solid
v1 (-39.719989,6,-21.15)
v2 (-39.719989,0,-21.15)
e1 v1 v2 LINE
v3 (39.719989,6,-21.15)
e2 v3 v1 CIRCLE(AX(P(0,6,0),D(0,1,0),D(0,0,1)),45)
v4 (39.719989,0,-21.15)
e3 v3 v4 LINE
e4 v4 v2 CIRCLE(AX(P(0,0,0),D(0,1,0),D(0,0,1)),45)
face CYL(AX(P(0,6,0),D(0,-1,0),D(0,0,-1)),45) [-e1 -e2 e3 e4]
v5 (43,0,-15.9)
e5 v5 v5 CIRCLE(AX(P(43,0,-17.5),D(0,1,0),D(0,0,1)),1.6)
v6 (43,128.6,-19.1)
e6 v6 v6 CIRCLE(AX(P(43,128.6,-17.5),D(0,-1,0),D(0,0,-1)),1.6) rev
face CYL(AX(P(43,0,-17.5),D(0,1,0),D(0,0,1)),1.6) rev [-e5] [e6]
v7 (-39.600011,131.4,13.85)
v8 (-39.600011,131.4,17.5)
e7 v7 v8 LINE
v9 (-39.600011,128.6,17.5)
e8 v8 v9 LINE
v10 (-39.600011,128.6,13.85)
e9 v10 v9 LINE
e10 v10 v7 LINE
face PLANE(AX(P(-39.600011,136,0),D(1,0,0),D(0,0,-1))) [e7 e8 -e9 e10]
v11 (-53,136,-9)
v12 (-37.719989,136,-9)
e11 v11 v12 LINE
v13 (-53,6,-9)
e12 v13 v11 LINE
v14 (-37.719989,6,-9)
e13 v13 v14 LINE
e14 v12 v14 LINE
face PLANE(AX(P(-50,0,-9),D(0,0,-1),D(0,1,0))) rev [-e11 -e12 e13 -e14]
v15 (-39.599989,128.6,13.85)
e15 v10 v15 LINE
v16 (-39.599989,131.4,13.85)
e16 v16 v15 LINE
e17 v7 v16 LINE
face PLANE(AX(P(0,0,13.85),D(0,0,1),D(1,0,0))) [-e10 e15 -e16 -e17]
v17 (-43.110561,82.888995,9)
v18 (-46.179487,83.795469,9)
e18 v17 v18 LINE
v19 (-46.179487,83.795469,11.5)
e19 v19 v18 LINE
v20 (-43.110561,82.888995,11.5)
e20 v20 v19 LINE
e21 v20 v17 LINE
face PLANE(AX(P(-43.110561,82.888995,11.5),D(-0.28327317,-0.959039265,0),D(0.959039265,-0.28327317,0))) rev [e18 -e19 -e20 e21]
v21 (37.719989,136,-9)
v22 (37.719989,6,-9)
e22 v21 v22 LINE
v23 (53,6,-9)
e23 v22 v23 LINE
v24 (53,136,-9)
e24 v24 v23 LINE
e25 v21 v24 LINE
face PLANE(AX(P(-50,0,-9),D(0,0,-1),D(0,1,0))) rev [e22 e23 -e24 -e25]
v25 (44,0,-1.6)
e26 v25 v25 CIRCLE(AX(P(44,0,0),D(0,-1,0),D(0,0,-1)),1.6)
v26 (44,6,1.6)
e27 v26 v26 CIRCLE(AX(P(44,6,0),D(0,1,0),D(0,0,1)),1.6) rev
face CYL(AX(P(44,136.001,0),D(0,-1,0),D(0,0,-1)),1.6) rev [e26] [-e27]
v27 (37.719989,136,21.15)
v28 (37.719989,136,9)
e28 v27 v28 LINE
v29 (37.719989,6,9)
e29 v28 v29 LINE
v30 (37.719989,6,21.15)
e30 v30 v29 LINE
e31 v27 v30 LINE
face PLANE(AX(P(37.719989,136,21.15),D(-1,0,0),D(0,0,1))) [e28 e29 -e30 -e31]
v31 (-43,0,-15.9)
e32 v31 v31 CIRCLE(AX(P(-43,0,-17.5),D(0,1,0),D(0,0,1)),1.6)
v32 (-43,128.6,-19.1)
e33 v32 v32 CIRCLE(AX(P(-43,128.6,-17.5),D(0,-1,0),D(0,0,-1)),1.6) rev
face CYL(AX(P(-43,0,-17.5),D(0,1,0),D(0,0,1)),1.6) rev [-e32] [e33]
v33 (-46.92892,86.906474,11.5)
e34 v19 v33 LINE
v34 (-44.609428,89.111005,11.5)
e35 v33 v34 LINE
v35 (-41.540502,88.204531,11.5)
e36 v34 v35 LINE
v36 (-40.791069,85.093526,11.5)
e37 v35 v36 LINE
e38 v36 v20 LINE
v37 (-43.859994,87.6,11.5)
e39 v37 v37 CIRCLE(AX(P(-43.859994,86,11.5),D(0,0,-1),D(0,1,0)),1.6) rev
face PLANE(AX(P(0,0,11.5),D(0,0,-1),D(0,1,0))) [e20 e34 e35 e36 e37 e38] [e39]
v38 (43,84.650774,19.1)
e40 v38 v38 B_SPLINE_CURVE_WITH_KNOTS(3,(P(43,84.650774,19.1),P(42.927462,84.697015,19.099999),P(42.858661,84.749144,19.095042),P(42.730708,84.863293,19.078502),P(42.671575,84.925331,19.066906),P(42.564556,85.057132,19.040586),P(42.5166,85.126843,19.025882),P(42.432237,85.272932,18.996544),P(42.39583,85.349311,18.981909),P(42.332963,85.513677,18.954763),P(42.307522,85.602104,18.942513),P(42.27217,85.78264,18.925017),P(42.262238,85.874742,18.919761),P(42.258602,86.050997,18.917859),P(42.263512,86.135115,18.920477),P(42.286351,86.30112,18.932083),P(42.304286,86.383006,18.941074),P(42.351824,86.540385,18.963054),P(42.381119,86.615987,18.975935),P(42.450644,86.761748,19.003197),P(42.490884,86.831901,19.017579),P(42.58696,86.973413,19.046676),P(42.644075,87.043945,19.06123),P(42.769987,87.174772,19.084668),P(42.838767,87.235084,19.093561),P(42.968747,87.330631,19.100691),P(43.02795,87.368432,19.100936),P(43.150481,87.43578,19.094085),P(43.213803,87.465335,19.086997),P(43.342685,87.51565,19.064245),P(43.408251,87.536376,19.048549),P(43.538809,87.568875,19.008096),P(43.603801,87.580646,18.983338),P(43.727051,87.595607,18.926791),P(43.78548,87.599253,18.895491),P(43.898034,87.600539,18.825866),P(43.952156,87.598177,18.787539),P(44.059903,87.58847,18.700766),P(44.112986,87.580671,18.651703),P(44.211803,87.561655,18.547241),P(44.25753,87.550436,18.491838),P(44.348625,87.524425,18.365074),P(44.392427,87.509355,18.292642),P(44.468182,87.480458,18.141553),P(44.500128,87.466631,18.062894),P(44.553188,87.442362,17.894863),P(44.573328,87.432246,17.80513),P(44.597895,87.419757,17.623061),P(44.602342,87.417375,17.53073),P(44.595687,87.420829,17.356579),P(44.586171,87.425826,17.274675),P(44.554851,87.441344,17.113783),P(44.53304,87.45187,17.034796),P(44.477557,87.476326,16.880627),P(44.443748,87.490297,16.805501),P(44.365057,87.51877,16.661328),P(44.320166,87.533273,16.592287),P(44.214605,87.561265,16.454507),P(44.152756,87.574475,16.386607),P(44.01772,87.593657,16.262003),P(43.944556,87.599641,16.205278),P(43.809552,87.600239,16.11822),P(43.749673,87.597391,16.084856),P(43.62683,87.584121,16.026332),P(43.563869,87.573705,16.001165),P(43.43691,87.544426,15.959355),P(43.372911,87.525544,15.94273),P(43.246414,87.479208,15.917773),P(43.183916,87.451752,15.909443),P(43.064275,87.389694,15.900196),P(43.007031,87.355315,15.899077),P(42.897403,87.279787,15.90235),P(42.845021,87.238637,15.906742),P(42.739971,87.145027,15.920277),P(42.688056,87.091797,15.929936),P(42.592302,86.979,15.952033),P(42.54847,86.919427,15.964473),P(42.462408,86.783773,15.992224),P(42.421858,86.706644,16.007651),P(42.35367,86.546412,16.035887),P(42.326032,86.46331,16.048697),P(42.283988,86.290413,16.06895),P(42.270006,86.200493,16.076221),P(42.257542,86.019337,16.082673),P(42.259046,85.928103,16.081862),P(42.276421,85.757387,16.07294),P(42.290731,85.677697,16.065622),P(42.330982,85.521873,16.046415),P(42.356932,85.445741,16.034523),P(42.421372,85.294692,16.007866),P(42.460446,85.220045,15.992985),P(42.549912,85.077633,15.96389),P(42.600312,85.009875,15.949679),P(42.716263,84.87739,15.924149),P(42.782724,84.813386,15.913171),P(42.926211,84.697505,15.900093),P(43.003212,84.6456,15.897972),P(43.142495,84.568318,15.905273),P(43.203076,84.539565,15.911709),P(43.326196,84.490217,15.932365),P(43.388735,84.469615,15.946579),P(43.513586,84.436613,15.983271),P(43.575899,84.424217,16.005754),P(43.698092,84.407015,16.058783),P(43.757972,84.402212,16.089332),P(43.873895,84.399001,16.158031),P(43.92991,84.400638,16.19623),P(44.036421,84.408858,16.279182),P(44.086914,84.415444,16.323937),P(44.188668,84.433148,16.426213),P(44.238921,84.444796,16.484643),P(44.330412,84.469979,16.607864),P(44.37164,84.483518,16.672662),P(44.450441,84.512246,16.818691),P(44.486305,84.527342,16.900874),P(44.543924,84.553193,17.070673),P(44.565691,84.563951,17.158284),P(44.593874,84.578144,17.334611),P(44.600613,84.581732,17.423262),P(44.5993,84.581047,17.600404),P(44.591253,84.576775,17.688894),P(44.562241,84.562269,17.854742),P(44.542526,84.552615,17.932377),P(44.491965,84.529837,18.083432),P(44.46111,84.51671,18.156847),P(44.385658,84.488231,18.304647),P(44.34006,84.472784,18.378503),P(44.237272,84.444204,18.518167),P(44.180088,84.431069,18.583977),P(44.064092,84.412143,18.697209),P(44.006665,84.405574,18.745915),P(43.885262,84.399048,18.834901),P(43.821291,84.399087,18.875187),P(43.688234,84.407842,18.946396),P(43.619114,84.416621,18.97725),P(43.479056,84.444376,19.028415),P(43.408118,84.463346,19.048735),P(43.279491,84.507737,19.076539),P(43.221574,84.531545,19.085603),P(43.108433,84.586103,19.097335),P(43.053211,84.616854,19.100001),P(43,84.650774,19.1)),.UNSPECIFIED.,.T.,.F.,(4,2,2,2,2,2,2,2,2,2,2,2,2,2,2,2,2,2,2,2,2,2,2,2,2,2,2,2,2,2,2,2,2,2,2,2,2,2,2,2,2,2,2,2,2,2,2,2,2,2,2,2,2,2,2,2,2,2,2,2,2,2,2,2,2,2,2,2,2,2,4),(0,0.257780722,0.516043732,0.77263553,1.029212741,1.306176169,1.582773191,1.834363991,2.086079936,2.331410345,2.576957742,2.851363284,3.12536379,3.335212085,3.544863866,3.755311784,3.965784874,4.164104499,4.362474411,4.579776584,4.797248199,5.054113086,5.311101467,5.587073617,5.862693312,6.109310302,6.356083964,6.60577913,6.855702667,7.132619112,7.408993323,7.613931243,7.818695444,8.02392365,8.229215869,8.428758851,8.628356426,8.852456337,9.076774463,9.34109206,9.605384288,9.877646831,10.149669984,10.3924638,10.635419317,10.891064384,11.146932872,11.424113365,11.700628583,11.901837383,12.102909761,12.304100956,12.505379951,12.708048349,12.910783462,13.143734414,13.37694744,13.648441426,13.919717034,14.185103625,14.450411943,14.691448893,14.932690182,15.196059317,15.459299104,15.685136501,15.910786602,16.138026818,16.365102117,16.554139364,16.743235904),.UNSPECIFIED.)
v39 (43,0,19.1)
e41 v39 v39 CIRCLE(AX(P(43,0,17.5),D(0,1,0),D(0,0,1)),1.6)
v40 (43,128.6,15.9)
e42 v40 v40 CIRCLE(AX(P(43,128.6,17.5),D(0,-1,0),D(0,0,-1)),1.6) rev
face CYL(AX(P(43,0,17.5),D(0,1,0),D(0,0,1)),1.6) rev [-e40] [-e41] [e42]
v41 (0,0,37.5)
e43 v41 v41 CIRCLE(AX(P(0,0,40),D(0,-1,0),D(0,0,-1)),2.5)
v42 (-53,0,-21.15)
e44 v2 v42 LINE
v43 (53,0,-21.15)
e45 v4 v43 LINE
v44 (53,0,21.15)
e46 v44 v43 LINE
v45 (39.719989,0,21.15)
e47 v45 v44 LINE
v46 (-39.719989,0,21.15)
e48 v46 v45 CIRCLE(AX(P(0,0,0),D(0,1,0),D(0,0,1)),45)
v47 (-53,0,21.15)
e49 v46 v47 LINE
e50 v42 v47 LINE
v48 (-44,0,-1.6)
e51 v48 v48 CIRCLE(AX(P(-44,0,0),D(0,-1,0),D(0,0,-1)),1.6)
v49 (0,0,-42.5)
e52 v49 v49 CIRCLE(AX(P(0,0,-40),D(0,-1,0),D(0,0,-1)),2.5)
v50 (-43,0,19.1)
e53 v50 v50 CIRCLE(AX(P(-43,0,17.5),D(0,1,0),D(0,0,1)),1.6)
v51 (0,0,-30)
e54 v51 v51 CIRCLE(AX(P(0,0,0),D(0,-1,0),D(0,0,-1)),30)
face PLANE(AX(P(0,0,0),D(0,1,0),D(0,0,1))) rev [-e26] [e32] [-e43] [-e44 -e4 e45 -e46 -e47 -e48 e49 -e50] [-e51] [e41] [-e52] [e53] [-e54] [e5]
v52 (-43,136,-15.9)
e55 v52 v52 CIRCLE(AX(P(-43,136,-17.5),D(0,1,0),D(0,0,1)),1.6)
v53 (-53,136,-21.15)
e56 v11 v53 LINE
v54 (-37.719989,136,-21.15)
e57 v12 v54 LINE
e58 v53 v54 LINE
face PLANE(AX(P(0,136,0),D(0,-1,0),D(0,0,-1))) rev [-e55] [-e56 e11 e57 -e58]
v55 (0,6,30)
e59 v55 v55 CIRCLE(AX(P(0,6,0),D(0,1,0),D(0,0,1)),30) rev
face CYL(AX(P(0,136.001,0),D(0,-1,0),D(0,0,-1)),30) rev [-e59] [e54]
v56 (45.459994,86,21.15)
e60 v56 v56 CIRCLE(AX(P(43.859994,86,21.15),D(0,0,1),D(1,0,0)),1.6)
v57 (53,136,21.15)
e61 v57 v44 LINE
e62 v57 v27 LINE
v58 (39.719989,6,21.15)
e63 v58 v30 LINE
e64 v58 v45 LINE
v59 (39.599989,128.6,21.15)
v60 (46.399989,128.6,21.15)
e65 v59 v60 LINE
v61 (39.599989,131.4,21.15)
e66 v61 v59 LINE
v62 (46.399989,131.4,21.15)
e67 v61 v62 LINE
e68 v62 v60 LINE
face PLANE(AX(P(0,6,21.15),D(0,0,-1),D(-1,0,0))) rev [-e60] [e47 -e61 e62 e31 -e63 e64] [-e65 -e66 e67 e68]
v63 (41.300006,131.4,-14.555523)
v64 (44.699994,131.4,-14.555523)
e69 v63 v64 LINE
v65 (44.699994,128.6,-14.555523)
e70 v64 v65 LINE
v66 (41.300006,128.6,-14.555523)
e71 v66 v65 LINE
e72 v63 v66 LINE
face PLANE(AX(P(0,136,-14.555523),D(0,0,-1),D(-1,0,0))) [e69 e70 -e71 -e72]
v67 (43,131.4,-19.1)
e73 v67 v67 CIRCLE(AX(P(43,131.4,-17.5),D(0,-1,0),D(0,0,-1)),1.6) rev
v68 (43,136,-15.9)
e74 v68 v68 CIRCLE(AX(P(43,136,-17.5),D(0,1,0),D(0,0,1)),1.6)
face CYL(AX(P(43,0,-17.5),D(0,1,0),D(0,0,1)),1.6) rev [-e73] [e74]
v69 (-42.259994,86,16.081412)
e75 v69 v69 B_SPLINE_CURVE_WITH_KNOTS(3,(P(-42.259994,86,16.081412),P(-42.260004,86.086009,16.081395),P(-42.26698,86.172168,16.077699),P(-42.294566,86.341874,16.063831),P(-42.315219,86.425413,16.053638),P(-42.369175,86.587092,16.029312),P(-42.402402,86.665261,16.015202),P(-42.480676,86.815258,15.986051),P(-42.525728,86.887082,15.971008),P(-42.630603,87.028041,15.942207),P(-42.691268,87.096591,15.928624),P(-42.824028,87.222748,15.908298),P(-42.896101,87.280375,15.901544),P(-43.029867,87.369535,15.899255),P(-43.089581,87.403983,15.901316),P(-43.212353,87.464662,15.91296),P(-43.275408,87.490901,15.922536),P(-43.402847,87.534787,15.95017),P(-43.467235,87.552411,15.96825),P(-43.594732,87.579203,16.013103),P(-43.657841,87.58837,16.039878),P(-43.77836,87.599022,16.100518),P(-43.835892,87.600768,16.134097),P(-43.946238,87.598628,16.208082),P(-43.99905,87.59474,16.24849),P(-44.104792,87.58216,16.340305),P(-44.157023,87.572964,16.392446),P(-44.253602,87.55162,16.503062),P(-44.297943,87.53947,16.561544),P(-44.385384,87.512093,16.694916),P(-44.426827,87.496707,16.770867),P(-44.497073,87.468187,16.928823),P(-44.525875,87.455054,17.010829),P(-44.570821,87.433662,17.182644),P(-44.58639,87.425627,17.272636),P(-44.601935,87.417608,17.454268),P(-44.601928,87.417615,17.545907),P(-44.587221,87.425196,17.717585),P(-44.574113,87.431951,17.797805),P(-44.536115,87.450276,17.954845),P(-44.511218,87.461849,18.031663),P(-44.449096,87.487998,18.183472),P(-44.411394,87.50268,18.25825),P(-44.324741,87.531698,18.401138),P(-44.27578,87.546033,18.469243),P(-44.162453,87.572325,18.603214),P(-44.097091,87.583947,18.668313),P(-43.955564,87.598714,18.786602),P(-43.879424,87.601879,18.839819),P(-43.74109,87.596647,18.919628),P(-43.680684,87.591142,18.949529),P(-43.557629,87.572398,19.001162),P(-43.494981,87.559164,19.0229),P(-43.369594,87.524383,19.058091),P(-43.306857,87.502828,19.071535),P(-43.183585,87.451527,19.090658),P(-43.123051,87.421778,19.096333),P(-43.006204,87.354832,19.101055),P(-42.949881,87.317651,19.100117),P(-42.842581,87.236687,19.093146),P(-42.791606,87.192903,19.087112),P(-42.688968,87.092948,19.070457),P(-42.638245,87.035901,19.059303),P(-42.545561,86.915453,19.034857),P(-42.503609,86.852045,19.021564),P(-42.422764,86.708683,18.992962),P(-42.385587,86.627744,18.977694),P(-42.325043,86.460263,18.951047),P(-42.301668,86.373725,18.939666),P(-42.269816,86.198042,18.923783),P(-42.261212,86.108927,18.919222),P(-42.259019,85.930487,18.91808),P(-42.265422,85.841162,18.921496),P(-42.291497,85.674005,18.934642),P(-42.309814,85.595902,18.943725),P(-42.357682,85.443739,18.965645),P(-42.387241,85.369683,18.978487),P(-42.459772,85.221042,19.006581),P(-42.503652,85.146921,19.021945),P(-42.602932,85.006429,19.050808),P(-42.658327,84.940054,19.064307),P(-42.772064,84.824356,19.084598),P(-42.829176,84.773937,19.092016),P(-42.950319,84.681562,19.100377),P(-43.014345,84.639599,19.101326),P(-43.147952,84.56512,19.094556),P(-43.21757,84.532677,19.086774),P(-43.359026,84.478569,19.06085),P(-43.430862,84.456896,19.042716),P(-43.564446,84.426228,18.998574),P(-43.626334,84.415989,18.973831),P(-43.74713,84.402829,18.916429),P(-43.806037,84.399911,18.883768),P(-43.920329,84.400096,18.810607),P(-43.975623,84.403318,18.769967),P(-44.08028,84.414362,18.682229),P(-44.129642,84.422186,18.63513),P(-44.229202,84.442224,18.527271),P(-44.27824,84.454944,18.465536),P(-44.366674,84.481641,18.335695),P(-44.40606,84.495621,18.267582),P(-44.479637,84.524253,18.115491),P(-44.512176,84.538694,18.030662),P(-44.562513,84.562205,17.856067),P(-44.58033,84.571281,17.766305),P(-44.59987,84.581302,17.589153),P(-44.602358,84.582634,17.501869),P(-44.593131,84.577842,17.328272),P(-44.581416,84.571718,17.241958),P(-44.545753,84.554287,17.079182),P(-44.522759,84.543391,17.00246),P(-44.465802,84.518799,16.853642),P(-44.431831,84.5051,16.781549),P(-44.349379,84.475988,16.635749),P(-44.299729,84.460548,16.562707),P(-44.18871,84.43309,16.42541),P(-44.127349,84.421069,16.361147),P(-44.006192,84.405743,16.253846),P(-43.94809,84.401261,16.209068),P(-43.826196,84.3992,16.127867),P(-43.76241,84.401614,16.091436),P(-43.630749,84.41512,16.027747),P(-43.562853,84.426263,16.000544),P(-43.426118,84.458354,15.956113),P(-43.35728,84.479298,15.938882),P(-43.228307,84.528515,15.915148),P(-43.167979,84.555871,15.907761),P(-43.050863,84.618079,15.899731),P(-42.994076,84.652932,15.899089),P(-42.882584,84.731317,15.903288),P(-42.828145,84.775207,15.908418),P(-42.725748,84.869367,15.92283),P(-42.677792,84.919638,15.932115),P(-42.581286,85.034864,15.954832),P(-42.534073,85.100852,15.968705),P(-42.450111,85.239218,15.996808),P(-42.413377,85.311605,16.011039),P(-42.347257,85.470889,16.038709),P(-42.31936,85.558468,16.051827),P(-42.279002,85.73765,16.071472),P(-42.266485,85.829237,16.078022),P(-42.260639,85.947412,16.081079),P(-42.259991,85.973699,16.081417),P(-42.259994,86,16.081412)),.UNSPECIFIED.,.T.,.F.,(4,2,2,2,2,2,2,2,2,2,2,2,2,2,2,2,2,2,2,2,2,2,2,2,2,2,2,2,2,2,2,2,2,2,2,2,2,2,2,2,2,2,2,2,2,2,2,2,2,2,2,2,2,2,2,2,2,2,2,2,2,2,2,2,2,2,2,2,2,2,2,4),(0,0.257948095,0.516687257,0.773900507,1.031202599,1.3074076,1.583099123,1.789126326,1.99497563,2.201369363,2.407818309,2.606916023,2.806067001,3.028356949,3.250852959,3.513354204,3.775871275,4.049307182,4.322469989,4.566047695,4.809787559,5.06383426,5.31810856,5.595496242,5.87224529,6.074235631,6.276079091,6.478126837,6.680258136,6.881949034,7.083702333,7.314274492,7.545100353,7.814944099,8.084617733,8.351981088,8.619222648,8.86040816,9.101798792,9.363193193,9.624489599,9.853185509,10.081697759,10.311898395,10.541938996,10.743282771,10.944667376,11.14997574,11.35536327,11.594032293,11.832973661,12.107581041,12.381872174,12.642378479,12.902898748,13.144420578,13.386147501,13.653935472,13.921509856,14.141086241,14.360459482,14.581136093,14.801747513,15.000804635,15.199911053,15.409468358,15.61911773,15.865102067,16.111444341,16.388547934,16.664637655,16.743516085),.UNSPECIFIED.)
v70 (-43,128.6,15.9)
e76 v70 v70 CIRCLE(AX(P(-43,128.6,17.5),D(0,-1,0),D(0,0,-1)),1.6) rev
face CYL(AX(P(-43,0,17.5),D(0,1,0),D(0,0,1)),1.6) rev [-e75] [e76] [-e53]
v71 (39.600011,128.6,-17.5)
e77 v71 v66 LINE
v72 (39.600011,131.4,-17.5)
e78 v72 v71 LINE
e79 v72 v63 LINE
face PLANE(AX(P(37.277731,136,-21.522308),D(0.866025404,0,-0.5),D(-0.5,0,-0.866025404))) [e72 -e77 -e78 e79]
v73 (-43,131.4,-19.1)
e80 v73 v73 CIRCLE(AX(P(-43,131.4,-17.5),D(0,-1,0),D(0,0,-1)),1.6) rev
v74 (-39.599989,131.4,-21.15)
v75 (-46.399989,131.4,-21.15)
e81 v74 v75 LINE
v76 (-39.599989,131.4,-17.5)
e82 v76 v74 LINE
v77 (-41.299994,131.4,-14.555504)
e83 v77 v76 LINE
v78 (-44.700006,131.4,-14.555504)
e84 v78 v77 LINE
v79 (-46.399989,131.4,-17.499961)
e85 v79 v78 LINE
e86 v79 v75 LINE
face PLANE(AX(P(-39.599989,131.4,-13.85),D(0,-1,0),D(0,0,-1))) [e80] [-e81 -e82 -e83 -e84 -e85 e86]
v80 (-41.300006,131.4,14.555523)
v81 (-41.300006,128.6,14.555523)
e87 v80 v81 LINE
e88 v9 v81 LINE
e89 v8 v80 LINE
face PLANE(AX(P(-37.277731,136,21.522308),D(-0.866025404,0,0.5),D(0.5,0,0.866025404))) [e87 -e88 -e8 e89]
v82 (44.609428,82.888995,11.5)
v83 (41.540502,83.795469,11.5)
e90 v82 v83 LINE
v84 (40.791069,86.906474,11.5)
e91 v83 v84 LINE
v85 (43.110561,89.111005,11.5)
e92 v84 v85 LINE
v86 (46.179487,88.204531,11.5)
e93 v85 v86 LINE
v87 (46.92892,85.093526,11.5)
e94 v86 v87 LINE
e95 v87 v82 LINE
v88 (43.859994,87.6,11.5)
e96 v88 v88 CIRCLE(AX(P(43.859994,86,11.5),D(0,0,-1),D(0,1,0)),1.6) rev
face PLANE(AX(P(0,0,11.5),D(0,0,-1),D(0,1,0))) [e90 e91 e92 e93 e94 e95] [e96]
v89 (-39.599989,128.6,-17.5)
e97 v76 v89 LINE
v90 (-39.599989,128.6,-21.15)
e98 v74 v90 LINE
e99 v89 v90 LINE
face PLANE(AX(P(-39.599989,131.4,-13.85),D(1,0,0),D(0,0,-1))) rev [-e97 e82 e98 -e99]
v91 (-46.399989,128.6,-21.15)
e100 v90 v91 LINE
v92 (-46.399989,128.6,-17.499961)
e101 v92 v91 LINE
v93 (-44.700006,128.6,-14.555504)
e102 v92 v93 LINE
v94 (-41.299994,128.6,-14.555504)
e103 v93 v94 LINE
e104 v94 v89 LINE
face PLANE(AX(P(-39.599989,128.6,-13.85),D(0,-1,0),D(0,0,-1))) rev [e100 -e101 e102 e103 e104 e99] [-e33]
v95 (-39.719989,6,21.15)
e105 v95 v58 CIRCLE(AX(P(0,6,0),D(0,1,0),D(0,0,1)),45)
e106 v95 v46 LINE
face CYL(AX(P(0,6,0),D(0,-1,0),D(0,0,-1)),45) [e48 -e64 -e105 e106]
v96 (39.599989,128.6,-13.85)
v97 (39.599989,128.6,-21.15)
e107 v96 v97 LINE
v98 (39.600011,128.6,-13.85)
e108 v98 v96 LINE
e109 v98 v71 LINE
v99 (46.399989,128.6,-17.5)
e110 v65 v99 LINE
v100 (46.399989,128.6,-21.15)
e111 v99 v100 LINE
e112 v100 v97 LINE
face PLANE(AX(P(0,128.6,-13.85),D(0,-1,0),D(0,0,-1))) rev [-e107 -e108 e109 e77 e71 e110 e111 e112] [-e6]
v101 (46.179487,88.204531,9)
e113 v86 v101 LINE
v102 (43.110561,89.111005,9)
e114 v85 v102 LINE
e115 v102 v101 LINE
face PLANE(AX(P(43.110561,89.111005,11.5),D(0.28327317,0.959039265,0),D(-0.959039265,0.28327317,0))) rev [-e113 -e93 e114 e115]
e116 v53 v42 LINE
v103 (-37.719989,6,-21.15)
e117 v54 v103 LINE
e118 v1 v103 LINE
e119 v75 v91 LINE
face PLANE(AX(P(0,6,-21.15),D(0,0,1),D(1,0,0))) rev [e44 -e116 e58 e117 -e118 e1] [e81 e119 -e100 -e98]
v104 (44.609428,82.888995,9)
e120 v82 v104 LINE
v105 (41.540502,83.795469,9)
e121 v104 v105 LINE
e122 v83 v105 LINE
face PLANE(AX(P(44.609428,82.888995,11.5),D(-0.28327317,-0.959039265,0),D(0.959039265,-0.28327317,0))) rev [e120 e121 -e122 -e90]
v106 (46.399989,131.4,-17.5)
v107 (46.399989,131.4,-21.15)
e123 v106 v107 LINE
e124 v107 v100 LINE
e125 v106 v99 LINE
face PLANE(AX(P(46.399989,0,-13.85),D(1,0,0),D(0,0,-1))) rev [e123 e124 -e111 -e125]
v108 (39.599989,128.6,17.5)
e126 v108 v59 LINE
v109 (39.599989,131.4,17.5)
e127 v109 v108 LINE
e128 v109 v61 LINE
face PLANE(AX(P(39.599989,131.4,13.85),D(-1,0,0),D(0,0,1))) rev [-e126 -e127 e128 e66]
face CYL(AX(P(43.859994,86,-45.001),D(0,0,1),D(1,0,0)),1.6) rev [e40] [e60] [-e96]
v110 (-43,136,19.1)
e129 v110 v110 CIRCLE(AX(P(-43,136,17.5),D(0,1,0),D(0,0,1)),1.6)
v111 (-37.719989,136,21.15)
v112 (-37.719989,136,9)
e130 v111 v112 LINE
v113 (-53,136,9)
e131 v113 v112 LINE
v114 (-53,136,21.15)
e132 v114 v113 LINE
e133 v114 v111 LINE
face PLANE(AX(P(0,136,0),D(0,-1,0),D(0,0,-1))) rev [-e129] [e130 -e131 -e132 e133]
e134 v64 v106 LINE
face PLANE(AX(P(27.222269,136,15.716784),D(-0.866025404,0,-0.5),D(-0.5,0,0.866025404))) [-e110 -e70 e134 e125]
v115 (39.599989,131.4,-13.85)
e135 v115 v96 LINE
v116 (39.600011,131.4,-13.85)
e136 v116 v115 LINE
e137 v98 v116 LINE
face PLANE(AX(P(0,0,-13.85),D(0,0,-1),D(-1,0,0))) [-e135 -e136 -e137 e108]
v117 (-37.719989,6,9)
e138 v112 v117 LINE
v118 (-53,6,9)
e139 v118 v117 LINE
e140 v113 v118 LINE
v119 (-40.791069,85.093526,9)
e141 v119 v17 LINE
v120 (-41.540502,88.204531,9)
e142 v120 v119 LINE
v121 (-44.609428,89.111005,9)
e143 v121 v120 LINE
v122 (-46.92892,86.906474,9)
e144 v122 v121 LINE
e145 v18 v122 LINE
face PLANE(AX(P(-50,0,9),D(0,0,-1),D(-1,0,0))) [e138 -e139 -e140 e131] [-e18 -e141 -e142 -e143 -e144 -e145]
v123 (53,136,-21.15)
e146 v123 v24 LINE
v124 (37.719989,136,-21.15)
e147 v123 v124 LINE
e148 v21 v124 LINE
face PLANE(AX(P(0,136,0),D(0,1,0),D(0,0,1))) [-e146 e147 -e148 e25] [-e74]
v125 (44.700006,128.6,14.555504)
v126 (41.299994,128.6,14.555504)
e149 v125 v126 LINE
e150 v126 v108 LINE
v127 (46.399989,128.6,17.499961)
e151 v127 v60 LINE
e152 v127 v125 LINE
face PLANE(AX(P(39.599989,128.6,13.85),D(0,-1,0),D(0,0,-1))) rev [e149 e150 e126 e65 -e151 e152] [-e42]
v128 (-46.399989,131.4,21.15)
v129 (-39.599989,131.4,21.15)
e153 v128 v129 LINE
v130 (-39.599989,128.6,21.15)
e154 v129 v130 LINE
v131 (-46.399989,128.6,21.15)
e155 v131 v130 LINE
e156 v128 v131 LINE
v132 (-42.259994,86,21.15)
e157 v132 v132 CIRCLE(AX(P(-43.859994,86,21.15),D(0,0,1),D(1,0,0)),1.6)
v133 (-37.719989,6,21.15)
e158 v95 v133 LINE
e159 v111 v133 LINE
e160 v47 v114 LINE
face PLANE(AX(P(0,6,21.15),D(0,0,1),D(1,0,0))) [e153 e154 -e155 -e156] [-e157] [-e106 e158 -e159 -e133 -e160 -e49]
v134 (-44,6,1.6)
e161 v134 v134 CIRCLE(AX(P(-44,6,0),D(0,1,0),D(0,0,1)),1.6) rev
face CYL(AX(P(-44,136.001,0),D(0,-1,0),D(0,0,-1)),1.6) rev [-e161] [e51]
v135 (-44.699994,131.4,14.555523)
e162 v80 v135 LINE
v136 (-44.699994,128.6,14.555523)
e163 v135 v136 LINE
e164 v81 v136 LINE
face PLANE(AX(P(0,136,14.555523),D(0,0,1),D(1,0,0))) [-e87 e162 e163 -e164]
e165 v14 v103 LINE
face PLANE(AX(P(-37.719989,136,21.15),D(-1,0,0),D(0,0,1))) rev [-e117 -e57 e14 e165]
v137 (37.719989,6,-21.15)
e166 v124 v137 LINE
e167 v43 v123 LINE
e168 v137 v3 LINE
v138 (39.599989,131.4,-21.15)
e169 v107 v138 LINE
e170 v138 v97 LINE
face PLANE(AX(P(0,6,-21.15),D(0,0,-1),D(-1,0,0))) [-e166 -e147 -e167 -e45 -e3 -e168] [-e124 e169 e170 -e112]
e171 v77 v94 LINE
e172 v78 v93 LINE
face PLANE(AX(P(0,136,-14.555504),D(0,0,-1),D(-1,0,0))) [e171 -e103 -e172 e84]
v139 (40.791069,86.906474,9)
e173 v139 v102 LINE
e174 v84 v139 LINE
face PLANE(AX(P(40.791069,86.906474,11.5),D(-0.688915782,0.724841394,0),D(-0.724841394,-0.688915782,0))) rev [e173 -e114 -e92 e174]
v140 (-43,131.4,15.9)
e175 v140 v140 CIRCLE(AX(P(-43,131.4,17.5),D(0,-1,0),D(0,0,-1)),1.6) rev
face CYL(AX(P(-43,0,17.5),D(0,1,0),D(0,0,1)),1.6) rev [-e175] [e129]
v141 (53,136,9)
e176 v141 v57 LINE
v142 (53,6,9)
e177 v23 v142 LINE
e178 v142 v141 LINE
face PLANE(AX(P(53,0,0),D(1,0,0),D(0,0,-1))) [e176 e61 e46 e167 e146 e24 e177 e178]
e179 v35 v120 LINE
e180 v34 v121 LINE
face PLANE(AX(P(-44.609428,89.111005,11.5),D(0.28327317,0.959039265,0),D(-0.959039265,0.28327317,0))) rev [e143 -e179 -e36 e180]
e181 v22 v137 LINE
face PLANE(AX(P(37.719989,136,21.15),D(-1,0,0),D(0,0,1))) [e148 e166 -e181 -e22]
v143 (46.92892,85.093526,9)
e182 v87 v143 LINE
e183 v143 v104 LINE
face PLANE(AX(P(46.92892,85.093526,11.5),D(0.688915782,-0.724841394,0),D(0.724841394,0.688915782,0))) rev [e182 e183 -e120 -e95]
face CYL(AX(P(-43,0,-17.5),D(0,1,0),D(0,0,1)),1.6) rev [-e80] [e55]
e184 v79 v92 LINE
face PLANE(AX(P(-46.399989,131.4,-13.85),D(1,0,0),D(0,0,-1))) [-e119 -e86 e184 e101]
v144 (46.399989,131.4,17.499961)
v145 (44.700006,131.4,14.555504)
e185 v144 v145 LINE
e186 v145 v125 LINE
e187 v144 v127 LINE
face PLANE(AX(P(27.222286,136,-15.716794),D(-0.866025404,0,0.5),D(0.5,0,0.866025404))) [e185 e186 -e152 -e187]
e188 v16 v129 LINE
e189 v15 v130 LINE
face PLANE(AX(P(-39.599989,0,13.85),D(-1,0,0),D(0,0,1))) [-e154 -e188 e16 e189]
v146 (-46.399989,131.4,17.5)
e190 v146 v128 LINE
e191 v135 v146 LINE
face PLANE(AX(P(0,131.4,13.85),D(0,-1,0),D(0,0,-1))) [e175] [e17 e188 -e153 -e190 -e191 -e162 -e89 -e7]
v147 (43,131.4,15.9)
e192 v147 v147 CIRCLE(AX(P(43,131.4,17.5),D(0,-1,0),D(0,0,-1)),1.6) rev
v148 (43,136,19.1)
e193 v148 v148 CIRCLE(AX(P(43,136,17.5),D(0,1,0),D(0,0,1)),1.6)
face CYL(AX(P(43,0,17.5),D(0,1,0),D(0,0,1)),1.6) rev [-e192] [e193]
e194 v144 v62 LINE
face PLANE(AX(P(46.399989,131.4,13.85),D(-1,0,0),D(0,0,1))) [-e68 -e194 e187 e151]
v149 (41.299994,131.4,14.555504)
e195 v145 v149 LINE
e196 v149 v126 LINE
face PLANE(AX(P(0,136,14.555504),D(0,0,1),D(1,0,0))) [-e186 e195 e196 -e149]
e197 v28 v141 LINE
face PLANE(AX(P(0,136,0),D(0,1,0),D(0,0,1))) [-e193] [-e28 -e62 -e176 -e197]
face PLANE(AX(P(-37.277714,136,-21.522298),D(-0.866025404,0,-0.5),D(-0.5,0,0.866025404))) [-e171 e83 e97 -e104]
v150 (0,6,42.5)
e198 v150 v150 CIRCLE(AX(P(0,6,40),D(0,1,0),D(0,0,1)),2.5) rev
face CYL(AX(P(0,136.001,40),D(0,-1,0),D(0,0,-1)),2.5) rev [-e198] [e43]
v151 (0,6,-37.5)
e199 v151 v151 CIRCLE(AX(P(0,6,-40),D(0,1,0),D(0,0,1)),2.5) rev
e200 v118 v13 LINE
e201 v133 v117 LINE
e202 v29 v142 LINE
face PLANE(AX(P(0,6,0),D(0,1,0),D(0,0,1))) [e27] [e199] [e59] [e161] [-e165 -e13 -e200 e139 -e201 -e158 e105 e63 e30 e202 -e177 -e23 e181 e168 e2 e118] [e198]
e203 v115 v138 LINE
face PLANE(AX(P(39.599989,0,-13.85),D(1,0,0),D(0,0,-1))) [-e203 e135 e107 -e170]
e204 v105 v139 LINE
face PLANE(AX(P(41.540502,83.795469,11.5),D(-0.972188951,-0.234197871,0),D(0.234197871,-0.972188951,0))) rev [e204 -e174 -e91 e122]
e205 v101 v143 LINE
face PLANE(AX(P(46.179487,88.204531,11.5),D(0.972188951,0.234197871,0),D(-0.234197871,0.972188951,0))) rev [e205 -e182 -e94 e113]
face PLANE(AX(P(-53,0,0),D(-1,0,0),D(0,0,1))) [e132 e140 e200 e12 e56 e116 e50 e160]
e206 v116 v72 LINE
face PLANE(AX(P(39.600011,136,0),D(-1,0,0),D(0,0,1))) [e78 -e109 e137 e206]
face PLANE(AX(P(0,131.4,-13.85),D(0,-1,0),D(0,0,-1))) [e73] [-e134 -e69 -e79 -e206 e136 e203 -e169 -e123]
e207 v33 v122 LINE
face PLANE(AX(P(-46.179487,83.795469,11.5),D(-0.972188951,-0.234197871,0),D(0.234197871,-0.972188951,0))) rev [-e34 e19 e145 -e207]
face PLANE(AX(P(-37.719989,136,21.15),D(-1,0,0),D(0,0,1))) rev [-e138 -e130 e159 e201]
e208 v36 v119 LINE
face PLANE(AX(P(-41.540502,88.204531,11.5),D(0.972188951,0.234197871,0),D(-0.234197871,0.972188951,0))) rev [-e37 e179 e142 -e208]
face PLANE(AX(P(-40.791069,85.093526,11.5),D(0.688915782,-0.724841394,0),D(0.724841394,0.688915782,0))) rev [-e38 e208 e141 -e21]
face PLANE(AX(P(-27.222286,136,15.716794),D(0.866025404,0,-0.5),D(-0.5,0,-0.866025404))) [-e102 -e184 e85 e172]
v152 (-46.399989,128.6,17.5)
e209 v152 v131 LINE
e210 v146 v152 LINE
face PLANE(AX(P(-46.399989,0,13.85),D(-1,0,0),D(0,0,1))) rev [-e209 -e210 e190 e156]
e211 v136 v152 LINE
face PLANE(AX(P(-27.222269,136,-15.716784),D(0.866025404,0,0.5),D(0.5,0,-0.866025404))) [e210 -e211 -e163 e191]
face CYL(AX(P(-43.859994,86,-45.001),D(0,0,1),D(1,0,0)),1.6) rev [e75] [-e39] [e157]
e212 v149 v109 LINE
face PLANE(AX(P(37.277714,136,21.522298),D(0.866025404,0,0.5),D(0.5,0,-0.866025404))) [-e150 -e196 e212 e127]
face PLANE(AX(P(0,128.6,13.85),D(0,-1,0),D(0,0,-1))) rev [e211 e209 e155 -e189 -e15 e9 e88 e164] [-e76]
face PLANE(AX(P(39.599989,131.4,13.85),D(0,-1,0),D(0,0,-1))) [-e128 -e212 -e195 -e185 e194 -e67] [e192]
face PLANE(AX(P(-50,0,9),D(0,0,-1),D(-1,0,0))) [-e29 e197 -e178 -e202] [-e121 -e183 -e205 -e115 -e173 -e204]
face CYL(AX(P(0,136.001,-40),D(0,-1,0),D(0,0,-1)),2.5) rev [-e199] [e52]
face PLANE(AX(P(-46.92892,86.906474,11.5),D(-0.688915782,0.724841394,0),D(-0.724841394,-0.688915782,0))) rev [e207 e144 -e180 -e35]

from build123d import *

# Parameters (mm, degrees)
BODY_DEPTH                    = 6
SKETCH2_W                     = 10.280011329
SKETCH2_H                     = 42.3
SKETCH2_W_2                   = 2
WINGS_DEPTH                   = 130
SKETCH3_R                     = 1.6
MOUNTING_BORE_DEPTH           = 152.726728034
CUT_EXCESS_MATERIAL_DEPTH     = 175.702604445
CUT_BATTERY_MOUNT_REACH       = 153.727
SKETCH6_R                     = 1.6
SKETCH8_W                     = 6.8
SKETCH8_H                     = 2.8
CAPTURE_NUT_1_DEPTH           = 7.3
CIRPATTERN1_COUNT             = 2
SKETCH10_W                    = 6.8
SKETCH10_H                    = 2.8
CAPTURE_NUT_2_DEPTH           = 7.3
CIRPATTERN2_COUNT             = 2
CUT_CENTER_HOLE_REACH         = 153.727
SKETCH11_R                    = 30
CUT_HARNESS_MOUNT_REACH       = 153.727
SKETCH12_R                    = 2.5
CAPTIVE_NUT_WALL_1_DEPTH      = 2.8
CAPTIVE_NUT_WALL_2_REACH      = 147.131
CAPTIVE_NUT_WALL_3_REACH      = 147.131
CAPTIVE_NUT_WALL_4_REACH      = 147.131
MIDDLE_DECK_HOLES_REACH       = 161.285
SKETCH20_R                    = 1.6
MIDDLE_DECK_CAPTIVE_NUT_DEPTH = 2.5
WING_EXTRA_WIDTH_1_DEPTH      = 3
WING_EXTRA_WIDTH_2_DEPTH      = 3


with BuildPart() as part:
    # Sketch1 → body (new body)
    with BuildSketch(Plane(origin=(0, 0, 0), x_dir=(1, 0, 0), z_dir=(0, 1, 0))):
        with BuildLine():
            ThreePointArc((-39.719988671, -21.15), (-45, 0), (-39.719988671, 21.15))
            Line((-39.719988671, 21.15), (-50, 21.15))
            Line((-50, 21.15), (-50, -21.15))
            Line((-50, -21.15), (-39.719988671, -21.15))
        make_face()
        with BuildLine():
            Line((-16, -21.15), (-16, 21.15))
            Line((-16, 21.15), (-39.719988671, 21.15))
            ThreePointArc((-39.719988671, 21.15), (-45, 0), (-39.719988671, -21.15))
            Line((-39.719988671, -21.15), (-16, -21.15))
        make_face()
        with BuildLine():
            Line((-39.719988671, 21.15), (-16, 21.15))
            Line((-16, 21.15), (-16, -21.15))
            Line((-16, -21.15), (-39.719988671, -21.15))
            ThreePointArc((-39.719988671, -21.15), (0, -45), (39.719988671, -21.15))
            Line((39.719988671, -21.15), (16, -21.15))
            Line((16, -21.15), (16, 21.15))
            Line((16, 21.15), (39.719988671, 21.15))
            ThreePointArc((39.719988671, 21.15), (0, 45), (-39.719988671, 21.15))
        make_face()
        with BuildLine():
            ThreePointArc((45, 0), (43.66004747, 10.899552968), (39.719988671, 21.15))
            Line((39.719988671, 21.15), (16, 21.15))
            Line((16, 21.15), (16, -21.15))
            Line((16, -21.15), (39.719988671, -21.15))
            ThreePointArc((39.719988671, -21.15), (43.66004747, -10.899552968), (45, 0))
        make_face()
        with BuildLine():
            Line((50, 21.15), (39.719988671, 21.15))
            ThreePointArc((39.719988671, 21.15), (43.66004747, 10.899552968), (45, 0))
            ThreePointArc((45, 0), (43.66004747, -10.899552968), (39.719988671, -21.15))
            Line((39.719988671, -21.15), (50, -21.15))
            Line((50, -21.15), (50, 21.15))
        make_face()
    extrude(amount=BODY_DEPTH)

    # Sketch2 → wings (add)
    with BuildSketch(Plane(origin=(0, 6, 0), x_dir=(1, 0, 0), z_dir=(0, 1, 0))):
        with Locations((44.859994336, 0)):
            Rectangle(SKETCH2_W, SKETCH2_H)
        with Locations((-44.859994336, 0)):
            Rectangle(SKETCH2_W, SKETCH2_H)
        with Locations((-38.719988671, 0)):
            Rectangle(SKETCH2_W_2, SKETCH2_H)
        with Locations((38.719988671, 0)):
            Rectangle(SKETCH2_W_2, SKETCH2_H)
    extrude(amount=WINGS_DEPTH)

    # Sketch3 → mounting-bore (cut, through all)
    with BuildSketch(Plane(origin=(0, 136, 0), x_dir=(1, 0, 0), z_dir=(0, 1, 0))):
        with Locations(Location((43, -17.5, 0), (0, 0, 270))):
            Circle(SKETCH3_R)
        with Locations(Location((-43, -17.5, 0), (0, 0, 270))):
            Circle(SKETCH3_R)
        with Locations(Location((-43, 17.5, 0), (0, 0, 270))):
            Circle(SKETCH3_R)
        with Locations(Location((43, 17.5, 0), (0, 0, 270))):
            Circle(SKETCH3_R)
    extrude(amount=-MOUNTING_BORE_DEPTH, mode=Mode.SUBTRACT)

    # Sketch5 → cut-excess-material (cut, through all)
    with BuildSketch(Plane(origin=(50, 0, 0), x_dir=(0, 0, -1), z_dir=(1, 0, 0))):
        Polygon((0, 6), (9, 6), (9, 136), (-9, 136), (-9, 6), align=None)
    extrude(amount=-CUT_EXCESS_MATERIAL_DEPTH, mode=Mode.SUBTRACT)

    # Sketch6 → cut-battery-mount (cut, up to next)
    with BuildSketch(Plane.XZ, mode=Mode.PRIVATE) as cut_battery_mount_sk1:
        with Locations(Location((-44, 0, 0), (0, 0, 270))):
            Circle(SKETCH6_R)
    cut_battery_mount_tool1 = extrude(cut_battery_mount_sk1.sketch, amount=-CUT_BATTERY_MOUNT_REACH, mode=Mode.PRIVATE) & part.part
    # Sketch6 → cut-battery-mount (cut, up to next)
    with BuildSketch(Plane.XZ, mode=Mode.PRIVATE) as cut_battery_mount_sk2:
        with Locations(Location((44, 0, 0), (0, 0, 270))):
            Circle(SKETCH6_R)
    cut_battery_mount_tool2 = extrude(cut_battery_mount_sk2.sketch, amount=-CUT_BATTERY_MOUNT_REACH, mode=Mode.PRIVATE) & part.part
    add(cut_battery_mount_tool1.solids().sort_by_distance((-44, 0, 0))[0], mode=Mode.SUBTRACT)
    add(cut_battery_mount_tool2.solids().sort_by_distance((44, 0, 0))[0], mode=Mode.SUBTRACT)

    # Sketch8 → capture-nut-1 (cut)
    with BuildSketch(Plane.XY.offset(21.15)):
        with Locations((42.999988671, 130)):
            Rectangle(SKETCH8_W, SKETCH8_H)
    capture_nut_1 = extrude(amount=-CAPTURE_NUT_1_DEPTH, mode=Mode.SUBTRACT)

    # CirPattern1: capture-nut-1 ×2 about axis
    cirpattern1_axis = Axis((0, 0, 0), (0, 1, 0))
    for i in range(1, CIRPATTERN1_COUNT):
        add(capture_nut_1.rotate(cirpattern1_axis, i * 360 / CIRPATTERN1_COUNT), mode=Mode.SUBTRACT)

    # Sketch10 → capture-nut-2 (cut)
    with BuildSketch(Plane(origin=(0, 0, -21.15), x_dir=(-1, 0, 0), z_dir=(0, 0, -1))):
        with Locations((-42.999988671, 130)):
            Rectangle(SKETCH10_W, SKETCH10_H)
    capture_nut_2 = extrude(amount=-CAPTURE_NUT_2_DEPTH, mode=Mode.SUBTRACT)

    # CirPattern2: capture-nut-2 ×2 about axis
    cirpattern2_axis = Axis((0, 0, 0), (0, 1, 0))
    for i in range(1, CIRPATTERN2_COUNT):
        add(capture_nut_2.rotate(cirpattern2_axis, i * 360 / CIRPATTERN2_COUNT), mode=Mode.SUBTRACT)

    # Sketch11 → cut-center-hole (cut, up to next)
    with BuildSketch(Plane.XZ, mode=Mode.PRIVATE) as cut_center_hole_sk1:
        with Locations(Location((0, 0, 0), (0, 0, 270))):
            Circle(SKETCH11_R)
    cut_center_hole_tool1 = extrude(cut_center_hole_sk1.sketch, amount=-CUT_CENTER_HOLE_REACH, mode=Mode.PRIVATE) & part.part
    add(cut_center_hole_tool1.solids().sort_by_distance((0, 0, 0))[0], mode=Mode.SUBTRACT)

    # Sketch12 → cut-harness-mount (cut, up to next)
    with BuildSketch(Plane.XZ, mode=Mode.PRIVATE) as cut_harness_mount_sk1:
        with Locations(Location((0, -40, 0), (0, 0, 270))):
            Circle(SKETCH12_R)
    cut_harness_mount_tool1 = extrude(cut_harness_mount_sk1.sketch, amount=-CUT_HARNESS_MOUNT_REACH, mode=Mode.PRIVATE) & part.part
    # Sketch12 → cut-harness-mount (cut, up to next)
    with BuildSketch(Plane.XZ, mode=Mode.PRIVATE) as cut_harness_mount_sk2:
        with Locations(Location((0, 40, 0), (0, 0, 270))):
            Circle(SKETCH12_R)
    cut_harness_mount_tool2 = extrude(cut_harness_mount_sk2.sketch, amount=-CUT_HARNESS_MOUNT_REACH, mode=Mode.PRIVATE) & part.part
    add(cut_harness_mount_tool1.solids().sort_by_distance((0, 0, -40))[0], mode=Mode.SUBTRACT)
    add(cut_harness_mount_tool2.solids().sort_by_distance((0, 0, 40))[0], mode=Mode.SUBTRACT)

    # Sketch13 → captive-nut-wall-1 (add)
    with BuildSketch(Plane(origin=(0, 128.6, 0), x_dir=(1, 0, 0), z_dir=(0, 1, 0))):
        Polygon((46.399988671, 13.85), (46.399988671, 17.5), (44.699994335, 14.555523439), (41.300005665, 14.555523439), (39.600011329, 17.5), (39.599988671, 13.85), align=None)
    extrude(amount=CAPTIVE_NUT_WALL_1_DEPTH)

    # Sketch14 → captive-nut-wall-2 (add, up to next)
    with BuildSketch(Plane(origin=(0, 128.6, 0), x_dir=(1, 0, 0), z_dir=(0, 1, 0)), mode=Mode.PRIVATE) as captive_nut_wall_2_sk1:
        Polygon((-39.599988671, 13.85), (-39.599988671, 17.5), (-41.299994335, 14.555503816), (-44.700005665, 14.555503816), (-46.400011329, 17.5), (-46.400011329, 13.85), align=None)
    captive_nut_wall_2_tool1 = extrude(captive_nut_wall_2_sk1.sketch, amount=CAPTIVE_NUT_WALL_2_REACH, mode=Mode.PRIVATE) - part.part
    add(captive_nut_wall_2_tool1.solids().sort_by_distance((-39.677166, 128.6, -15.675))[0])

    # Sketch16 → captive-nut-wall-3 (add, up to next)
    with BuildSketch(Plane(origin=(0, 128.6, 0), x_dir=(1, 0, 0), z_dir=(0, 1, 0)), mode=Mode.PRIVATE) as captive_nut_wall_3_sk1:
        Polygon((-46.399988671, -13.85), (-46.399988671, -17.5), (-44.699994335, -14.555523439), (-41.300005665, -14.555523439), (-39.600011329, -17.5), (-39.600011329, -13.85), align=None)
    captive_nut_wall_3_tool1 = extrude(captive_nut_wall_3_sk1.sketch, amount=CAPTIVE_NUT_WALL_3_REACH, mode=Mode.PRIVATE) - part.part
    add(captive_nut_wall_3_tool1.solids().sort_by_distance((-46.322812, 128.6, 15.675))[0])

    # Sketch17 → captive-nut-wall-4 (add, up to next)
    with BuildSketch(Plane(origin=(0, 128.6, 0), x_dir=(1, 0, 0), z_dir=(0, 1, 0)), mode=Mode.PRIVATE) as captive_nut_wall_4_sk1:
        Polygon((39.599988671, -13.85), (39.599988671, -17.5), (41.299994335, -14.555503816), (44.700005665, -14.555503816), (46.400011329, -17.5), (46.400011329, -13.85), align=None)
    captive_nut_wall_4_tool1 = extrude(captive_nut_wall_4_sk1.sketch, amount=CAPTIVE_NUT_WALL_4_REACH, mode=Mode.PRIVATE) - part.part
    add(captive_nut_wall_4_tool1.solids().sort_by_distance((39.677166, 128.6, 15.675))[0])

    # Sketch20 → middle-deck-holes (cut, up to next)
    with BuildSketch(Plane.XY.offset(21.15), mode=Mode.PRIVATE) as middle_deck_holes_sk1:
        with Locations((-43.859994335, 86)):
            Circle(SKETCH20_R)
    middle_deck_holes_tool1 = extrude(middle_deck_holes_sk1.sketch, amount=-MIDDLE_DECK_HOLES_REACH, mode=Mode.PRIVATE) & part.part
    # Sketch20 → middle-deck-holes (cut, up to next)
    with BuildSketch(Plane.XY.offset(21.15), mode=Mode.PRIVATE) as middle_deck_holes_sk2:
        with Locations((43.859994335, 86)):
            Circle(SKETCH20_R)
    middle_deck_holes_tool2 = extrude(middle_deck_holes_sk2.sketch, amount=-MIDDLE_DECK_HOLES_REACH, mode=Mode.PRIVATE) & part.part
    add(middle_deck_holes_tool1.solids().sort_by_distance((-43.859994, 86, 21.15))[0], mode=Mode.SUBTRACT)
    add(middle_deck_holes_tool2.solids().sort_by_distance((43.859994, 86, 21.15))[0], mode=Mode.SUBTRACT)

    # Sketch21 → middle-deck-captive-nut (cut)
    with BuildSketch(Plane(origin=(0, 0, 9), x_dir=(-1, 0, 0), z_dir=(0, 0, -1))):
        Polygon((44.609427523, 89.111004644), (41.540501876, 88.204530501), (40.791068688, 85.093525857), (43.110561148, 82.888995356), (46.179486795, 83.795469499), (46.928919982, 86.906474143), align=None)
        Polygon((-43.110561148, 89.111004644), (-46.179486795, 88.204530501), (-46.928919982, 85.093525857), (-44.609427523, 82.888995356), (-41.540501876, 83.795469499), (-40.791068688, 86.906474143), align=None)
    extrude(amount=-MIDDLE_DECK_CAPTIVE_NUT_DEPTH, mode=Mode.SUBTRACT)

    # Sketch22 → wing-extra-width-1 (add)
    with BuildSketch(Plane(origin=(50, 0, 0), x_dir=(0, 0, -1), z_dir=(1, 0, 0))):
        Polygon((21.15, 136), (9, 136), (9, 6), (-9, 6), (-9, 136), (-21.15, 136), (-21.15, 0), (21.15, 0), align=None)
    extrude(amount=WING_EXTRA_WIDTH_1_DEPTH)

    # Sketch24 → wing-extra-width-2 (add)
    with BuildSketch(Plane.ZY.offset(50)):
        Polygon((9, 136), (9, 6), (-9, 6), (-9, 136), (-21.15, 136), (-21.15, 0), (21.15, 0), (21.15, 136), align=None)
    extrude(amount=WING_EXTRA_WIDTH_2_DEPTH)


solid = part.part
